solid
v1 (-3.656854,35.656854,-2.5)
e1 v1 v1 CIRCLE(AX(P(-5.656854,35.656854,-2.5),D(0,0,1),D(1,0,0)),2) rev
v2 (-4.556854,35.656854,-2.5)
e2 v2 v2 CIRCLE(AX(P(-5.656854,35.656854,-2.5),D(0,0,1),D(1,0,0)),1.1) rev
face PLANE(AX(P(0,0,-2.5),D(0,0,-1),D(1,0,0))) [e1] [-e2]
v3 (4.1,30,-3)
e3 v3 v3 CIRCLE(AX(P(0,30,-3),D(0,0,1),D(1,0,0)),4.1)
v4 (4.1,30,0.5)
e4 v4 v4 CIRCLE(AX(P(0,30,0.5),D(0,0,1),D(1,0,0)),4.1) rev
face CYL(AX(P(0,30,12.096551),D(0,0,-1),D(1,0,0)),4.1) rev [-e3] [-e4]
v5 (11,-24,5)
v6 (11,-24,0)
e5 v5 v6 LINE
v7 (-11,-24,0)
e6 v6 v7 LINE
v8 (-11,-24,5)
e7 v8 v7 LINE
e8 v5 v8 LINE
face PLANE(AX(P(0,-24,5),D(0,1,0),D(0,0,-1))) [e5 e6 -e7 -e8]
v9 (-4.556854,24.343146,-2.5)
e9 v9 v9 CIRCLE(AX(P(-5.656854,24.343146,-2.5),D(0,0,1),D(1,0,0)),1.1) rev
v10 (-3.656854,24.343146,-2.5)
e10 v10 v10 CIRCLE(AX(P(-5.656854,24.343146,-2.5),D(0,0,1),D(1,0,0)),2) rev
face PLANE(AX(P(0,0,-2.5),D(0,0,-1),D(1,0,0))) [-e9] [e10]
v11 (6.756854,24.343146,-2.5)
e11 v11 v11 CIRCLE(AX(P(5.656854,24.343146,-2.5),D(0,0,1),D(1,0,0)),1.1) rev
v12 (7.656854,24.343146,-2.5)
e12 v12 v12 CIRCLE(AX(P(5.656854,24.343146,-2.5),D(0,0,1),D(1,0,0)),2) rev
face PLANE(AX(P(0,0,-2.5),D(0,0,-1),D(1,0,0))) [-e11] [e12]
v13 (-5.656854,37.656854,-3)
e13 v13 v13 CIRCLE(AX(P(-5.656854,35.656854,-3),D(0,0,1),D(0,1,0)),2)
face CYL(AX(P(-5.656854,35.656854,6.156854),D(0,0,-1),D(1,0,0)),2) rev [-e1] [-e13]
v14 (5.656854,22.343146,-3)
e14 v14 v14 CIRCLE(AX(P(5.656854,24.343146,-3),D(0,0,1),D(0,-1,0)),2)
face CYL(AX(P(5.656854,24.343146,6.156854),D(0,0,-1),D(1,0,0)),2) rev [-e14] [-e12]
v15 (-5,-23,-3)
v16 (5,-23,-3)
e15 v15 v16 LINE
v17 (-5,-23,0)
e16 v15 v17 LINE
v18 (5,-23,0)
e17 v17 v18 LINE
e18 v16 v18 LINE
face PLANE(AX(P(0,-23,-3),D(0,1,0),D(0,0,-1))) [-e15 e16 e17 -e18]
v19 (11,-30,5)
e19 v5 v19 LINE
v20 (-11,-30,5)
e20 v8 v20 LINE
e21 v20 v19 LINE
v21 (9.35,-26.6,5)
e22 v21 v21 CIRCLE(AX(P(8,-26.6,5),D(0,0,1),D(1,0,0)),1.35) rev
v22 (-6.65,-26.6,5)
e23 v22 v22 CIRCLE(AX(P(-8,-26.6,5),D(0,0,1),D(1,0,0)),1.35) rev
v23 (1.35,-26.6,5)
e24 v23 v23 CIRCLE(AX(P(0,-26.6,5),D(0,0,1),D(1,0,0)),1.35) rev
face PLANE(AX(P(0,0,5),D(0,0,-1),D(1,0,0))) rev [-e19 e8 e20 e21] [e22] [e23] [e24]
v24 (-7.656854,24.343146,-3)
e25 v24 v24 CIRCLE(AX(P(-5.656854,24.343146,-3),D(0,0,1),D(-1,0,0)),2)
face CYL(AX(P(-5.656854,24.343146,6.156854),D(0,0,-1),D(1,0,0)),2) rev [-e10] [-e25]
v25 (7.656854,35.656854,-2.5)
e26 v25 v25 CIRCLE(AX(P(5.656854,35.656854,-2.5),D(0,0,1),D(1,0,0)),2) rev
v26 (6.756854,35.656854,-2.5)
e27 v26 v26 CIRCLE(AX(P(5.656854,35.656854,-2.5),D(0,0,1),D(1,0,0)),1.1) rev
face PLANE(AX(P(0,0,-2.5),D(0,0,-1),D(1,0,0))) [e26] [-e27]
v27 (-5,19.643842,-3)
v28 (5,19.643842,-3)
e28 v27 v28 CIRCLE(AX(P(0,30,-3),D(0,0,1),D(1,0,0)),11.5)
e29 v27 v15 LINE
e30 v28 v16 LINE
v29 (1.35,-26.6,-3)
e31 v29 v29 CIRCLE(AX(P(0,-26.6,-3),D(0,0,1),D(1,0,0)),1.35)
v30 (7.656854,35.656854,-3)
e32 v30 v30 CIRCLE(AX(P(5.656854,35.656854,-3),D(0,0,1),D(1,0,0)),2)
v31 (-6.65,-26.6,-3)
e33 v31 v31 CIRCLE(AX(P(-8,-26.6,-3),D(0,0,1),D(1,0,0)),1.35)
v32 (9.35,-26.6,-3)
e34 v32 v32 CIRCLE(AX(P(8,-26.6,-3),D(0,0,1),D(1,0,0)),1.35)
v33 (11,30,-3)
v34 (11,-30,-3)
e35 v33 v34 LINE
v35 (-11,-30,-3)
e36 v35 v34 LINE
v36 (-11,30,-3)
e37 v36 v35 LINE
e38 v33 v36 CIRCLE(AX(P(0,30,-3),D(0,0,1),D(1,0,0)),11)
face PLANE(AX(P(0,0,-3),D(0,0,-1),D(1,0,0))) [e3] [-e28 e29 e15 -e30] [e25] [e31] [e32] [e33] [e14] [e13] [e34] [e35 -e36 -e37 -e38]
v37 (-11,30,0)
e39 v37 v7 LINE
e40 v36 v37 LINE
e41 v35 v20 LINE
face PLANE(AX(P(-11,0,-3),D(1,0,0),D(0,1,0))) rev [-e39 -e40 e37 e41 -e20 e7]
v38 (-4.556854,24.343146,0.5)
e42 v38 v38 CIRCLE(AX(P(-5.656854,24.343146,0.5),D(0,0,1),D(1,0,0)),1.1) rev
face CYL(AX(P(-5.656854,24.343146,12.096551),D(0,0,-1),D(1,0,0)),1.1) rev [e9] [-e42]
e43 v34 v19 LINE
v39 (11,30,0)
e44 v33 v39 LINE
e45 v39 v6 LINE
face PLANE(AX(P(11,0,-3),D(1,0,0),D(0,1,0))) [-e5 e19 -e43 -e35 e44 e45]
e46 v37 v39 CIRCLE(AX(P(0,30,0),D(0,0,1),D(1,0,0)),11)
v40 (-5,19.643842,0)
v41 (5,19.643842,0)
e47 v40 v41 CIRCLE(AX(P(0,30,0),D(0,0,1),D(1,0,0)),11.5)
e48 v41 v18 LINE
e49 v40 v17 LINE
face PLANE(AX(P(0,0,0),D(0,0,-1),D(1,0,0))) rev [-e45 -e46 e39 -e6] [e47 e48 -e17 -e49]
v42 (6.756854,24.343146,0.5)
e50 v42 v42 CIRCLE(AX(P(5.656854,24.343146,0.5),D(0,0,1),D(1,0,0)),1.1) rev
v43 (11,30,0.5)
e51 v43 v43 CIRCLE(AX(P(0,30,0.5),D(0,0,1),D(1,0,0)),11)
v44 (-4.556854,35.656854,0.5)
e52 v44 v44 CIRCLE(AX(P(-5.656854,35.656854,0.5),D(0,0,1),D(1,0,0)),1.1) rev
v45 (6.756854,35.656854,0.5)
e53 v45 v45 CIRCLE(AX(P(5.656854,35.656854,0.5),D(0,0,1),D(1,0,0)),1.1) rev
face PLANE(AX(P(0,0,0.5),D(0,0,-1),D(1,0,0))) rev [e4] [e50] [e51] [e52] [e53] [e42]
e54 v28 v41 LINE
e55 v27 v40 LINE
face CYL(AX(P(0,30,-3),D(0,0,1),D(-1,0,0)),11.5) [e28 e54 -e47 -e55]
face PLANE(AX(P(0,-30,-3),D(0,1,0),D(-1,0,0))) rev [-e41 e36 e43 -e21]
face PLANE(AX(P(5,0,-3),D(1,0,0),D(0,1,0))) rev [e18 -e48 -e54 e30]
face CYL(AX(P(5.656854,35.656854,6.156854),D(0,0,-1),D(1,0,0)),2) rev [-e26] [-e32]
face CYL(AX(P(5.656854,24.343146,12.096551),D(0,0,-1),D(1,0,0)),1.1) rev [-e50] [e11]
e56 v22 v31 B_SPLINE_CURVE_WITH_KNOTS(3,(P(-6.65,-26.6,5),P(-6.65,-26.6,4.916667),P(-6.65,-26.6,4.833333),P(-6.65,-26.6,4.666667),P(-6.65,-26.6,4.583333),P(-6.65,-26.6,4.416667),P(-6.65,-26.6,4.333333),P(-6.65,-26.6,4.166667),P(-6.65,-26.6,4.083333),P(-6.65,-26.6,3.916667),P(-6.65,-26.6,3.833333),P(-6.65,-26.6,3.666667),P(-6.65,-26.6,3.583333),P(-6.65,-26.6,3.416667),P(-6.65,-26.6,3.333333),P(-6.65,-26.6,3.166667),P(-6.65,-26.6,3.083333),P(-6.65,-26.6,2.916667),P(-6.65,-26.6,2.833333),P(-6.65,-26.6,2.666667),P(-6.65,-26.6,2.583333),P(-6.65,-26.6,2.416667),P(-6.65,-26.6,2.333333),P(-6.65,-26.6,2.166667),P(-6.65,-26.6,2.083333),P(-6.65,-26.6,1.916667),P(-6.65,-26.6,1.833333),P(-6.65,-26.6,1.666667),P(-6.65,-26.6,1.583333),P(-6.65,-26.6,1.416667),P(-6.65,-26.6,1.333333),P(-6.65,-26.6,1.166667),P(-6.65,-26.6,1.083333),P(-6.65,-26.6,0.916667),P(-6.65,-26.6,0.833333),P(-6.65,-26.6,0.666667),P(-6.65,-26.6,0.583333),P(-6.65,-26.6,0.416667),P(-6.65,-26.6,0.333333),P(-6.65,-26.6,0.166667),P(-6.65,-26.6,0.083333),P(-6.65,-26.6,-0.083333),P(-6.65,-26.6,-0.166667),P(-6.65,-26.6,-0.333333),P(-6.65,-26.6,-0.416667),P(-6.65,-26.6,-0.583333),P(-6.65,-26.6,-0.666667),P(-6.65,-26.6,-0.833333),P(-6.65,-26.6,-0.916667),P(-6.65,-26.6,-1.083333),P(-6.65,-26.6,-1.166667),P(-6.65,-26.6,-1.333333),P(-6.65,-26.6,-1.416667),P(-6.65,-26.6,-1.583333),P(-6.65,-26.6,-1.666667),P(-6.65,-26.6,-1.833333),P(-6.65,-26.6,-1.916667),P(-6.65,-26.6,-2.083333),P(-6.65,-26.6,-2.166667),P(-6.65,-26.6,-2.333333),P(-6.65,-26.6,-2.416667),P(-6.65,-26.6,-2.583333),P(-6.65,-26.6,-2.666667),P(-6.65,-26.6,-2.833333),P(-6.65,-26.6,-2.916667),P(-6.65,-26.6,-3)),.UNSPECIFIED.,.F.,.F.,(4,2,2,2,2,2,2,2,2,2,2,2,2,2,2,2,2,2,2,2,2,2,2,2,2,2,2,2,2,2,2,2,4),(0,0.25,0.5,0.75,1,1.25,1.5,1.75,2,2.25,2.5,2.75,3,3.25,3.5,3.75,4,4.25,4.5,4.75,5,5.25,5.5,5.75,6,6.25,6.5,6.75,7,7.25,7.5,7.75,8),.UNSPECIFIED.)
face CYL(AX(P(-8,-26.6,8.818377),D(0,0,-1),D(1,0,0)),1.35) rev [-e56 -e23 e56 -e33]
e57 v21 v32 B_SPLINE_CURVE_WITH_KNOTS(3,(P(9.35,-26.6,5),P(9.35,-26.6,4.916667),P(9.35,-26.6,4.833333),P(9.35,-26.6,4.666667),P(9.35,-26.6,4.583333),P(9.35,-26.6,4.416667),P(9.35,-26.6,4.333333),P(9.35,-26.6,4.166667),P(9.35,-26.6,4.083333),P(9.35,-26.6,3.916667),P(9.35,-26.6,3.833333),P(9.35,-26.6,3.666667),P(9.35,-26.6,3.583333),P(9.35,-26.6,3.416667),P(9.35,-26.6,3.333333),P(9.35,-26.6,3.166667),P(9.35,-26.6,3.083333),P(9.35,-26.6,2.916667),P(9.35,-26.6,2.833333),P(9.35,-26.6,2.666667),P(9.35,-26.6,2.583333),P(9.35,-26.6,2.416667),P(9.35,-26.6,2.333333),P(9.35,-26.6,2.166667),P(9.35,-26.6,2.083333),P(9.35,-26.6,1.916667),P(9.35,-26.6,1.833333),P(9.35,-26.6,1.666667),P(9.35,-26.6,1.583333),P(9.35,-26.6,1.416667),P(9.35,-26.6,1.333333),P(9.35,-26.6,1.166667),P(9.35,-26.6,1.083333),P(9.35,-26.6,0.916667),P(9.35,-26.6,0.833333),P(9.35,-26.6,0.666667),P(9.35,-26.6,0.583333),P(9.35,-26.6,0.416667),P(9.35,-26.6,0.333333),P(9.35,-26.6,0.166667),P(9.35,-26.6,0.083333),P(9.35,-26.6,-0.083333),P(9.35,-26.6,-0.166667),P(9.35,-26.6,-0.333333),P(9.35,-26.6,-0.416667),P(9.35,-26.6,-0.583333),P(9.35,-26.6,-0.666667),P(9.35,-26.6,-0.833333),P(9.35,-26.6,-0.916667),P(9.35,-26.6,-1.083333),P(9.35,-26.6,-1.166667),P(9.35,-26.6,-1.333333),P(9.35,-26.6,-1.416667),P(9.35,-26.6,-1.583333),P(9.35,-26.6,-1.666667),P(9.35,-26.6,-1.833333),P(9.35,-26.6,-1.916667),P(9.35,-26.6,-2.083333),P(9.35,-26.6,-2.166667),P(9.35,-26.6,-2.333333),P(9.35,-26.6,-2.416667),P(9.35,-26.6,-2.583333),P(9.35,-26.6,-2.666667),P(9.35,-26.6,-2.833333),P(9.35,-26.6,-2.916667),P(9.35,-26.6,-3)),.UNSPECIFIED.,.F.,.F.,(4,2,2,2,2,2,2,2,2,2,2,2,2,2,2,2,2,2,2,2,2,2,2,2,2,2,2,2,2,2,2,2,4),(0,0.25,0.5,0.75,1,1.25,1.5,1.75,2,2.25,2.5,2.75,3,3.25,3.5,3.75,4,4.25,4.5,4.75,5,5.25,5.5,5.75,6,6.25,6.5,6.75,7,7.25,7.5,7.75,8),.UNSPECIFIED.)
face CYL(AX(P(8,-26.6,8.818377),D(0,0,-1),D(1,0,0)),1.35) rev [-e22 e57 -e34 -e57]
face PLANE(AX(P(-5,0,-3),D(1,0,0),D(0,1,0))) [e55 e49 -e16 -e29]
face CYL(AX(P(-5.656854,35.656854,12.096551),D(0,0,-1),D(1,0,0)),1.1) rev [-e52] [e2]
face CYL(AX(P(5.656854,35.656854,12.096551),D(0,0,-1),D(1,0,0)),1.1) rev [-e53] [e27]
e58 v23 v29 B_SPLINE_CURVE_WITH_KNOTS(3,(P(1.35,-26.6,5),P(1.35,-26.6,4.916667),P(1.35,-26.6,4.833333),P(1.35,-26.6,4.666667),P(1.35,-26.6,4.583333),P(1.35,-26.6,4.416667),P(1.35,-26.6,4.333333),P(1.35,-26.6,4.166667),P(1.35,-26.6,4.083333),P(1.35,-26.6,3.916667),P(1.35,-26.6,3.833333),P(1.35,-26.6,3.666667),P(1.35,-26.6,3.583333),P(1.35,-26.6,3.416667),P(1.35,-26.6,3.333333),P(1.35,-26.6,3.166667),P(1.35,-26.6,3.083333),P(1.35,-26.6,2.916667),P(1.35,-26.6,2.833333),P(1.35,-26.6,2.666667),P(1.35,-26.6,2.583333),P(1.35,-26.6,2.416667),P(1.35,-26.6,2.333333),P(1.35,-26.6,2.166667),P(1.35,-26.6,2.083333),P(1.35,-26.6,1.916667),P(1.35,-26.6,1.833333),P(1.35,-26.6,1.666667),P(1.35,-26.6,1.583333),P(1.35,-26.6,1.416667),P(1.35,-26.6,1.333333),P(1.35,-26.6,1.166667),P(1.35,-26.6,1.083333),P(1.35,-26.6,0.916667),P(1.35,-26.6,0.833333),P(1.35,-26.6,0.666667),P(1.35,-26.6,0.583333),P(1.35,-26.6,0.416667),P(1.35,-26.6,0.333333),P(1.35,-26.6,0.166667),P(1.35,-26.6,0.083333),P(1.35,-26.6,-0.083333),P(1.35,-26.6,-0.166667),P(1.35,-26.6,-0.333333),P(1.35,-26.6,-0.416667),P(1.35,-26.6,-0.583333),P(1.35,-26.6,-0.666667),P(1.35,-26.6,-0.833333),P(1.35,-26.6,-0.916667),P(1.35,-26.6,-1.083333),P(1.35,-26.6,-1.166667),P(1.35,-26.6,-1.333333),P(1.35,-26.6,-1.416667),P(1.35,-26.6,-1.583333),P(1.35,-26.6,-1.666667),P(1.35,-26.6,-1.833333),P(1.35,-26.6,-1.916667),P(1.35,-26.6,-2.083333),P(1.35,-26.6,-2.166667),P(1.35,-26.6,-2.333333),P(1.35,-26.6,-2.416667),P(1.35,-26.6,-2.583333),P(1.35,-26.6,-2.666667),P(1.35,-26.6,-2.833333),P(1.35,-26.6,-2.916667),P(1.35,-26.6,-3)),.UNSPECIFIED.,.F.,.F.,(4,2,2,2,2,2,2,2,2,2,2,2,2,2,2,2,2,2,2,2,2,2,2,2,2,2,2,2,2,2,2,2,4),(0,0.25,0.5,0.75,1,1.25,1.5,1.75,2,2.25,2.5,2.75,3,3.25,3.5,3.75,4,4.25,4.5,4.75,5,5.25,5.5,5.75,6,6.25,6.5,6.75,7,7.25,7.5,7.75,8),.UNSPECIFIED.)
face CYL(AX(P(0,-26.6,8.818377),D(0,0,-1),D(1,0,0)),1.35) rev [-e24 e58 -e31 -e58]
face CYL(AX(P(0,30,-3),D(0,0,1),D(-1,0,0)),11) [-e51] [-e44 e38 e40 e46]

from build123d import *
from build123d.topology import SkipClean

# Parameters (mm, degrees)
BOSS_EXTRUDE1_DEPTH           = 3
BOSS_EXTRUDE2_START           = -0.5
SKETCH1_3_R                   = 11
BOSS_EXTRUDE2_DEPTH           = 0.5
SKETCH2_R                     = 4.1
SKETCH2_R_2                   = 1.1
CUT_EXTRUDE1_DEPTH            = 3.5
SKETCH2_3_R                   = 2
CUT_EXTRUDE2_DEPTH            = 0.5
CIRPATTERN2_COUNT             = 4
SKETCH1_6_W                   = 11
SKETCH1_6_H                   = 6
BOSS_EXTRUDE3_DEPTH           = 5
SKETCH4_R                     = 1.35
CUT_EXTRUDE4_DEPTH            = 8
LPATTERN2_COUNT               = 2
LPATTERN2_PITCH               = 8
LPATTERN2_COL_COUNT           = 2
LPATTERN2_COL_PITCH           = 8
BODY_MOVE_COPY1_START         = -3
BODY_MOVE_COPY1_OUTLINE_R     = 2
BODY_MOVE_COPY1_OUTLINE_R_2   = 4.1
BODY_MOVE_COPY1_DEPTH         = 3
BODY_MOVE_COPY1_START_2       = 3
BODY_MOVE_COPY1_2_OUTLINE_W   = 22
BODY_MOVE_COPY1_2_OUTLINE_H   = 6
BODY_MOVE_COPY1_2_OUTLINE_R   = 1.35
BODY_MOVE_COPY1_2_DEPTH       = 2
BODY_MOVE_COPY1_START_3       = -2.5
BODY_MOVE_COPY1_3_OUTLINE_R   = 2
BODY_MOVE_COPY1_3_OUTLINE_R_2 = 1.1
BODY_MOVE_COPY1_3_DEPTH       = 2
BODY_MOVE_COPY1_START_4       = 0.5
BODY_MOVE_COPY1_4_OUTLINE_R   = 1.1
BODY_MOVE_COPY1_4_OUTLINE_R_2 = 4.1
BODY_MOVE_COPY1_4_DEPTH       = 2.5
BODY_MOVE_COPY1_5_DEPTH       = 0.5
BODY_MOVE_COPY1_START_5       = -5
BODY_MOVE_COPY1_6_OUTLINE_W   = 22
BODY_MOVE_COPY1_6_OUTLINE_H   = 6
BODY_MOVE_COPY1_6_OUTLINE_R   = 1.35
BODY_MOVE_COPY1_6_DEPTH       = 2


# Read off the part's stored shape, not the designer's step: Body-Move/Copy1
with BuildPart() as part:
    # Sketch1 → Boss-Extrude1 (new body)
    with BuildSketch(Plane.XY):
        with BuildLine():
            Line((-11, 30), (-11, -30))
            Line((-11, -30), (11, -30))
            Line((11, -30), (11, 30))
            ThreePointArc((11, 30), (0, 41), (-11, 30))
        make_face()
        with BuildLine():
            Line((5, -23), (-5, -23))
            Line((-5, -23), (-5, 19.643842411))
            ThreePointArc((-5, 19.643842411), (0, 18.5), (5, 19.643842411))
            Line((5, 19.643842411), (5, -23))
        make_face(mode=Mode.SUBTRACT)
    extrude(amount=BOSS_EXTRUDE1_DEPTH)

    # Sketch1<3> → Boss-Extrude2 (add)
    with BuildSketch(Plane.XY.offset(BOSS_EXTRUDE2_START)):
        with Locations((0, 30)):
            Circle(SKETCH1_3_R)
    extrude(amount=BOSS_EXTRUDE2_DEPTH)

    # Sketch2 → Cut-Extrude1 (cut)
    with BuildSketch(Plane.XY.offset(3)):
        with Locations((0, 30)):
            Circle(SKETCH2_R)
        with Locations((5.656854249, 35.656854249)):
            Circle(SKETCH2_R_2)
    cut_extrude1 = extrude(amount=-CUT_EXTRUDE1_DEPTH, mode=Mode.SUBTRACT)

    # Sketch2<3> → Cut-Extrude2 (cut)
    with BuildSketch(Plane.XY.offset(3)):
        with Locations((5.656854249, 35.656854249)):
            Circle(SKETCH2_3_R)
    cut_extrude2 = extrude(amount=-CUT_EXTRUDE2_DEPTH, mode=Mode.SUBTRACT)

    # CirPattern2: Cut-Extrude1, Cut-Extrude2 ×4 about axis
    cirpattern2_axis = Axis((0, 30, 0), (0, 0, 1))
    add([cut_extrude1.rotate(cirpattern2_axis, i * 360 / CIRPATTERN2_COUNT) for i in range(1, CIRPATTERN2_COUNT)], mode=Mode.SUBTRACT)
    add([cut_extrude2.rotate(cirpattern2_axis, i * 360 / CIRPATTERN2_COUNT) for i in range(1, CIRPATTERN2_COUNT)], mode=Mode.SUBTRACT)

    # Sketch1<6> → Boss-Extrude3 (add)
    with BuildSketch(Plane.XY):
        with Locations((-5.5, -27)):
            Rectangle(SKETCH1_6_W, SKETCH1_6_H)
        with Locations((5.5, -27)):
            Rectangle(SKETCH1_6_W, SKETCH1_6_H)
    extrude(amount=-BOSS_EXTRUDE3_DEPTH)

    # Sketch4 → Cut-Extrude4 (cut)
    with BuildSketch(Plane.XY.offset(3)):
        with Locations((0, -26.6)):
            Circle(SKETCH4_R)
    cut_extrude4 = extrude(amount=-CUT_EXTRUDE4_DEPTH, mode=Mode.SUBTRACT)

    # LPattern2: Cut-Extrude4 ×2
    with Locations(*[(i * LPATTERN2_PITCH, 0, 0) for i in range(1, LPATTERN2_COUNT)]):
        add(cut_extrude4, mode=Mode.SUBTRACT)

    # LPattern2 col: Cut-Extrude4 ×2
    with Locations(*[(-i * LPATTERN2_COL_PITCH, 0, 0) for i in range(1, LPATTERN2_COL_COUNT)]):
        add(cut_extrude4, mode=Mode.SUBTRACT)

    # Body-Move/Copy1 outline → Body-Move/Copy1 (add)
    with BuildSketch(Plane.XY.offset(BODY_MOVE_COPY1_START)):
        with BuildLine():
            Line((-11, -24), (11, -24))
            Line((11, -24), (11, 30))
            ThreePointArc((11, 30), (0, 41), (-11, 30))
            Line((-11, 30), (-11, -24))
        make_face()
        with BuildLine():
            Line((5, 19.643842411), (5, -23))
            Line((5, -23), (-5, -23))
            Line((-5, -23), (-5, 19.643842411))
            ThreePointArc((-5, 19.643842411), (0, 18.5), (5, 19.643842411))
        make_face(mode=Mode.SUBTRACT)
        with Locations((5.656854249, 35.656854249)):
            Circle(BODY_MOVE_COPY1_OUTLINE_R, mode=Mode.SUBTRACT)
        with Locations((-5.656854249, 24.343145751)):
            Circle(BODY_MOVE_COPY1_OUTLINE_R, mode=Mode.SUBTRACT)
        with Locations((-5.656854249, 35.656854249)):
            Circle(BODY_MOVE_COPY1_OUTLINE_R, mode=Mode.SUBTRACT)
        with Locations((0, 30)):
            Circle(BODY_MOVE_COPY1_OUTLINE_R_2, mode=Mode.SUBTRACT)
        with Locations((5.656854249, 24.343145751)):
            Circle(BODY_MOVE_COPY1_OUTLINE_R, mode=Mode.SUBTRACT)
    extrude(amount=BODY_MOVE_COPY1_DEPTH)

    # Body-Move_Copy1 2 outline → Body-Move_Copy1 2 (add)
    with BuildSketch(Plane.XY.offset(BODY_MOVE_COPY1_START_2)):
        with Locations((0, -27)):
            Rectangle(BODY_MOVE_COPY1_2_OUTLINE_W, BODY_MOVE_COPY1_2_OUTLINE_H)
        with Locations((-8, -26.6)):
            Circle(BODY_MOVE_COPY1_2_OUTLINE_R, mode=Mode.SUBTRACT)
        with Locations((0, -26.6)):
            Circle(BODY_MOVE_COPY1_2_OUTLINE_R, mode=Mode.SUBTRACT)
        with Locations((8, -26.6)):
            Circle(BODY_MOVE_COPY1_2_OUTLINE_R, mode=Mode.SUBTRACT)
    extrude(amount=BODY_MOVE_COPY1_2_DEPTH)

    # Body-Move_Copy1 3 outline → Body-Move_Copy1 3 (add)
    # profile 1 of 4: a face of its own
    with BuildSketch(Plane.XY.offset(BODY_MOVE_COPY1_START_3)):
        with Locations((5.656854249, 35.656854249)):
            Circle(BODY_MOVE_COPY1_3_OUTLINE_R)
        with Locations((5.656854249, 35.656854249)):
            Circle(BODY_MOVE_COPY1_3_OUTLINE_R_2, mode=Mode.SUBTRACT)
    # profile 2 of 4: a face of its own
    with BuildSketch(Plane.XY.offset(BODY_MOVE_COPY1_START_3)):
        with Locations((5.656854249, 24.343145751)):
            Circle(BODY_MOVE_COPY1_3_OUTLINE_R)
        with Locations((5.656854249, 24.343145751)):
            Circle(BODY_MOVE_COPY1_3_OUTLINE_R_2, mode=Mode.SUBTRACT)
    # profile 3 of 4: a face of its own
    with BuildSketch(Plane.XY.offset(BODY_MOVE_COPY1_START_3)):
        with Locations((-5.656854249, 35.656854249)):
            Circle(BODY_MOVE_COPY1_3_OUTLINE_R)
        with Locations((-5.656854249, 35.656854249)):
            Circle(BODY_MOVE_COPY1_3_OUTLINE_R_2, mode=Mode.SUBTRACT)
    # profile 4 of 4: a face of its own
    with BuildSketch(Plane.XY.offset(BODY_MOVE_COPY1_START_3)):
        with Locations((-5.656854249, 24.343145751)):
            Circle(BODY_MOVE_COPY1_3_OUTLINE_R)
        with Locations((-5.656854249, 24.343145751)):
            Circle(BODY_MOVE_COPY1_3_OUTLINE_R_2, mode=Mode.SUBTRACT)
    extrude(amount=BODY_MOVE_COPY1_3_DEPTH)

    # Body-Move_Copy1 4 outline → Body-Move_Copy1 4 (cut)
    with BuildSketch(Plane.XY.offset(BODY_MOVE_COPY1_START_4)):
        with BuildLine():
            ThreePointArc((11, 30), (0, 41), (-11, 30))
            Line((-11, 30), (-11, -24))
            Line((-11, -24), (11, -24))
            Line((11, -24), (11, 30))
        make_face()
        with Locations((5.656854249, 35.656854249)):
            Circle(BODY_MOVE_COPY1_4_OUTLINE_R, mode=Mode.SUBTRACT)
        with Locations((0, 30)):
            Circle(BODY_MOVE_COPY1_4_OUTLINE_R_2, mode=Mode.SUBTRACT)
        with BuildLine():
            Line((5, -23), (-5, -23))
            Line((-5, -23), (-5, 19.643842411))
            ThreePointArc((-5, 19.643842411), (0, 18.5), (5, 19.643842411))
            Line((5, 19.643842411), (5, -23))
        make_face(mode=Mode.SUBTRACT)
        with Locations((-5.656854249, 24.343145751)):
            Circle(BODY_MOVE_COPY1_4_OUTLINE_R, mode=Mode.SUBTRACT)
        with Locations((-5.656854249, 35.656854249)):
            Circle(BODY_MOVE_COPY1_4_OUTLINE_R, mode=Mode.SUBTRACT)
        with Locations((5.656854249, 24.343145751)):
            Circle(BODY_MOVE_COPY1_4_OUTLINE_R, mode=Mode.SUBTRACT)
    extrude(amount=BODY_MOVE_COPY1_4_DEPTH, mode=Mode.SUBTRACT)

    # Body-Move_Copy1 5 outline → Body-Move_Copy1 5 (cut)
    with SkipClean():  # the faces are left unmerged after this step: merging them gives an invalid solid
        with BuildSketch(Plane.XY):
            with BuildLine():
                Line((-11, -24), (11, -24))
                Line((11, -24), (11, 30))
                ThreePointArc((11, 30), (0, 19), (-11, 30))
                Line((-11, 30), (-11, -24))
            make_face()
            with BuildLine():
                Line((5, 19.643842411), (5, -23))
                Line((5, -23), (-5, -23))
                Line((-5, -23), (-5, 19.643842411))
                ThreePointArc((-5, 19.643842411), (0, 18.5), (5, 19.643842411))
            make_face(mode=Mode.SUBTRACT)
        extrude(amount=BODY_MOVE_COPY1_5_DEPTH, mode=Mode.SUBTRACT)
    add(part.part.scale(1), mode=Mode.REPLACE)  # the faces are merged on a copy

    # Body-Move_Copy1 6 outline → Body-Move_Copy1 6 (cut)
    with BuildSketch(Plane.XY.offset(BODY_MOVE_COPY1_START_5)):
        with Locations((0, -27)):
            Rectangle(BODY_MOVE_COPY1_6_OUTLINE_W, BODY_MOVE_COPY1_6_OUTLINE_H)
        with Locations((-8, -26.6)):
            Circle(BODY_MOVE_COPY1_6_OUTLINE_R, mode=Mode.SUBTRACT)
        with Locations((0, -26.6)):
            Circle(BODY_MOVE_COPY1_6_OUTLINE_R, mode=Mode.SUBTRACT)
        with Locations((8, -26.6)):
            Circle(BODY_MOVE_COPY1_6_OUTLINE_R, mode=Mode.SUBTRACT)
    extrude(amount=BODY_MOVE_COPY1_6_DEPTH, mode=Mode.SUBTRACT)


solid = part.part
